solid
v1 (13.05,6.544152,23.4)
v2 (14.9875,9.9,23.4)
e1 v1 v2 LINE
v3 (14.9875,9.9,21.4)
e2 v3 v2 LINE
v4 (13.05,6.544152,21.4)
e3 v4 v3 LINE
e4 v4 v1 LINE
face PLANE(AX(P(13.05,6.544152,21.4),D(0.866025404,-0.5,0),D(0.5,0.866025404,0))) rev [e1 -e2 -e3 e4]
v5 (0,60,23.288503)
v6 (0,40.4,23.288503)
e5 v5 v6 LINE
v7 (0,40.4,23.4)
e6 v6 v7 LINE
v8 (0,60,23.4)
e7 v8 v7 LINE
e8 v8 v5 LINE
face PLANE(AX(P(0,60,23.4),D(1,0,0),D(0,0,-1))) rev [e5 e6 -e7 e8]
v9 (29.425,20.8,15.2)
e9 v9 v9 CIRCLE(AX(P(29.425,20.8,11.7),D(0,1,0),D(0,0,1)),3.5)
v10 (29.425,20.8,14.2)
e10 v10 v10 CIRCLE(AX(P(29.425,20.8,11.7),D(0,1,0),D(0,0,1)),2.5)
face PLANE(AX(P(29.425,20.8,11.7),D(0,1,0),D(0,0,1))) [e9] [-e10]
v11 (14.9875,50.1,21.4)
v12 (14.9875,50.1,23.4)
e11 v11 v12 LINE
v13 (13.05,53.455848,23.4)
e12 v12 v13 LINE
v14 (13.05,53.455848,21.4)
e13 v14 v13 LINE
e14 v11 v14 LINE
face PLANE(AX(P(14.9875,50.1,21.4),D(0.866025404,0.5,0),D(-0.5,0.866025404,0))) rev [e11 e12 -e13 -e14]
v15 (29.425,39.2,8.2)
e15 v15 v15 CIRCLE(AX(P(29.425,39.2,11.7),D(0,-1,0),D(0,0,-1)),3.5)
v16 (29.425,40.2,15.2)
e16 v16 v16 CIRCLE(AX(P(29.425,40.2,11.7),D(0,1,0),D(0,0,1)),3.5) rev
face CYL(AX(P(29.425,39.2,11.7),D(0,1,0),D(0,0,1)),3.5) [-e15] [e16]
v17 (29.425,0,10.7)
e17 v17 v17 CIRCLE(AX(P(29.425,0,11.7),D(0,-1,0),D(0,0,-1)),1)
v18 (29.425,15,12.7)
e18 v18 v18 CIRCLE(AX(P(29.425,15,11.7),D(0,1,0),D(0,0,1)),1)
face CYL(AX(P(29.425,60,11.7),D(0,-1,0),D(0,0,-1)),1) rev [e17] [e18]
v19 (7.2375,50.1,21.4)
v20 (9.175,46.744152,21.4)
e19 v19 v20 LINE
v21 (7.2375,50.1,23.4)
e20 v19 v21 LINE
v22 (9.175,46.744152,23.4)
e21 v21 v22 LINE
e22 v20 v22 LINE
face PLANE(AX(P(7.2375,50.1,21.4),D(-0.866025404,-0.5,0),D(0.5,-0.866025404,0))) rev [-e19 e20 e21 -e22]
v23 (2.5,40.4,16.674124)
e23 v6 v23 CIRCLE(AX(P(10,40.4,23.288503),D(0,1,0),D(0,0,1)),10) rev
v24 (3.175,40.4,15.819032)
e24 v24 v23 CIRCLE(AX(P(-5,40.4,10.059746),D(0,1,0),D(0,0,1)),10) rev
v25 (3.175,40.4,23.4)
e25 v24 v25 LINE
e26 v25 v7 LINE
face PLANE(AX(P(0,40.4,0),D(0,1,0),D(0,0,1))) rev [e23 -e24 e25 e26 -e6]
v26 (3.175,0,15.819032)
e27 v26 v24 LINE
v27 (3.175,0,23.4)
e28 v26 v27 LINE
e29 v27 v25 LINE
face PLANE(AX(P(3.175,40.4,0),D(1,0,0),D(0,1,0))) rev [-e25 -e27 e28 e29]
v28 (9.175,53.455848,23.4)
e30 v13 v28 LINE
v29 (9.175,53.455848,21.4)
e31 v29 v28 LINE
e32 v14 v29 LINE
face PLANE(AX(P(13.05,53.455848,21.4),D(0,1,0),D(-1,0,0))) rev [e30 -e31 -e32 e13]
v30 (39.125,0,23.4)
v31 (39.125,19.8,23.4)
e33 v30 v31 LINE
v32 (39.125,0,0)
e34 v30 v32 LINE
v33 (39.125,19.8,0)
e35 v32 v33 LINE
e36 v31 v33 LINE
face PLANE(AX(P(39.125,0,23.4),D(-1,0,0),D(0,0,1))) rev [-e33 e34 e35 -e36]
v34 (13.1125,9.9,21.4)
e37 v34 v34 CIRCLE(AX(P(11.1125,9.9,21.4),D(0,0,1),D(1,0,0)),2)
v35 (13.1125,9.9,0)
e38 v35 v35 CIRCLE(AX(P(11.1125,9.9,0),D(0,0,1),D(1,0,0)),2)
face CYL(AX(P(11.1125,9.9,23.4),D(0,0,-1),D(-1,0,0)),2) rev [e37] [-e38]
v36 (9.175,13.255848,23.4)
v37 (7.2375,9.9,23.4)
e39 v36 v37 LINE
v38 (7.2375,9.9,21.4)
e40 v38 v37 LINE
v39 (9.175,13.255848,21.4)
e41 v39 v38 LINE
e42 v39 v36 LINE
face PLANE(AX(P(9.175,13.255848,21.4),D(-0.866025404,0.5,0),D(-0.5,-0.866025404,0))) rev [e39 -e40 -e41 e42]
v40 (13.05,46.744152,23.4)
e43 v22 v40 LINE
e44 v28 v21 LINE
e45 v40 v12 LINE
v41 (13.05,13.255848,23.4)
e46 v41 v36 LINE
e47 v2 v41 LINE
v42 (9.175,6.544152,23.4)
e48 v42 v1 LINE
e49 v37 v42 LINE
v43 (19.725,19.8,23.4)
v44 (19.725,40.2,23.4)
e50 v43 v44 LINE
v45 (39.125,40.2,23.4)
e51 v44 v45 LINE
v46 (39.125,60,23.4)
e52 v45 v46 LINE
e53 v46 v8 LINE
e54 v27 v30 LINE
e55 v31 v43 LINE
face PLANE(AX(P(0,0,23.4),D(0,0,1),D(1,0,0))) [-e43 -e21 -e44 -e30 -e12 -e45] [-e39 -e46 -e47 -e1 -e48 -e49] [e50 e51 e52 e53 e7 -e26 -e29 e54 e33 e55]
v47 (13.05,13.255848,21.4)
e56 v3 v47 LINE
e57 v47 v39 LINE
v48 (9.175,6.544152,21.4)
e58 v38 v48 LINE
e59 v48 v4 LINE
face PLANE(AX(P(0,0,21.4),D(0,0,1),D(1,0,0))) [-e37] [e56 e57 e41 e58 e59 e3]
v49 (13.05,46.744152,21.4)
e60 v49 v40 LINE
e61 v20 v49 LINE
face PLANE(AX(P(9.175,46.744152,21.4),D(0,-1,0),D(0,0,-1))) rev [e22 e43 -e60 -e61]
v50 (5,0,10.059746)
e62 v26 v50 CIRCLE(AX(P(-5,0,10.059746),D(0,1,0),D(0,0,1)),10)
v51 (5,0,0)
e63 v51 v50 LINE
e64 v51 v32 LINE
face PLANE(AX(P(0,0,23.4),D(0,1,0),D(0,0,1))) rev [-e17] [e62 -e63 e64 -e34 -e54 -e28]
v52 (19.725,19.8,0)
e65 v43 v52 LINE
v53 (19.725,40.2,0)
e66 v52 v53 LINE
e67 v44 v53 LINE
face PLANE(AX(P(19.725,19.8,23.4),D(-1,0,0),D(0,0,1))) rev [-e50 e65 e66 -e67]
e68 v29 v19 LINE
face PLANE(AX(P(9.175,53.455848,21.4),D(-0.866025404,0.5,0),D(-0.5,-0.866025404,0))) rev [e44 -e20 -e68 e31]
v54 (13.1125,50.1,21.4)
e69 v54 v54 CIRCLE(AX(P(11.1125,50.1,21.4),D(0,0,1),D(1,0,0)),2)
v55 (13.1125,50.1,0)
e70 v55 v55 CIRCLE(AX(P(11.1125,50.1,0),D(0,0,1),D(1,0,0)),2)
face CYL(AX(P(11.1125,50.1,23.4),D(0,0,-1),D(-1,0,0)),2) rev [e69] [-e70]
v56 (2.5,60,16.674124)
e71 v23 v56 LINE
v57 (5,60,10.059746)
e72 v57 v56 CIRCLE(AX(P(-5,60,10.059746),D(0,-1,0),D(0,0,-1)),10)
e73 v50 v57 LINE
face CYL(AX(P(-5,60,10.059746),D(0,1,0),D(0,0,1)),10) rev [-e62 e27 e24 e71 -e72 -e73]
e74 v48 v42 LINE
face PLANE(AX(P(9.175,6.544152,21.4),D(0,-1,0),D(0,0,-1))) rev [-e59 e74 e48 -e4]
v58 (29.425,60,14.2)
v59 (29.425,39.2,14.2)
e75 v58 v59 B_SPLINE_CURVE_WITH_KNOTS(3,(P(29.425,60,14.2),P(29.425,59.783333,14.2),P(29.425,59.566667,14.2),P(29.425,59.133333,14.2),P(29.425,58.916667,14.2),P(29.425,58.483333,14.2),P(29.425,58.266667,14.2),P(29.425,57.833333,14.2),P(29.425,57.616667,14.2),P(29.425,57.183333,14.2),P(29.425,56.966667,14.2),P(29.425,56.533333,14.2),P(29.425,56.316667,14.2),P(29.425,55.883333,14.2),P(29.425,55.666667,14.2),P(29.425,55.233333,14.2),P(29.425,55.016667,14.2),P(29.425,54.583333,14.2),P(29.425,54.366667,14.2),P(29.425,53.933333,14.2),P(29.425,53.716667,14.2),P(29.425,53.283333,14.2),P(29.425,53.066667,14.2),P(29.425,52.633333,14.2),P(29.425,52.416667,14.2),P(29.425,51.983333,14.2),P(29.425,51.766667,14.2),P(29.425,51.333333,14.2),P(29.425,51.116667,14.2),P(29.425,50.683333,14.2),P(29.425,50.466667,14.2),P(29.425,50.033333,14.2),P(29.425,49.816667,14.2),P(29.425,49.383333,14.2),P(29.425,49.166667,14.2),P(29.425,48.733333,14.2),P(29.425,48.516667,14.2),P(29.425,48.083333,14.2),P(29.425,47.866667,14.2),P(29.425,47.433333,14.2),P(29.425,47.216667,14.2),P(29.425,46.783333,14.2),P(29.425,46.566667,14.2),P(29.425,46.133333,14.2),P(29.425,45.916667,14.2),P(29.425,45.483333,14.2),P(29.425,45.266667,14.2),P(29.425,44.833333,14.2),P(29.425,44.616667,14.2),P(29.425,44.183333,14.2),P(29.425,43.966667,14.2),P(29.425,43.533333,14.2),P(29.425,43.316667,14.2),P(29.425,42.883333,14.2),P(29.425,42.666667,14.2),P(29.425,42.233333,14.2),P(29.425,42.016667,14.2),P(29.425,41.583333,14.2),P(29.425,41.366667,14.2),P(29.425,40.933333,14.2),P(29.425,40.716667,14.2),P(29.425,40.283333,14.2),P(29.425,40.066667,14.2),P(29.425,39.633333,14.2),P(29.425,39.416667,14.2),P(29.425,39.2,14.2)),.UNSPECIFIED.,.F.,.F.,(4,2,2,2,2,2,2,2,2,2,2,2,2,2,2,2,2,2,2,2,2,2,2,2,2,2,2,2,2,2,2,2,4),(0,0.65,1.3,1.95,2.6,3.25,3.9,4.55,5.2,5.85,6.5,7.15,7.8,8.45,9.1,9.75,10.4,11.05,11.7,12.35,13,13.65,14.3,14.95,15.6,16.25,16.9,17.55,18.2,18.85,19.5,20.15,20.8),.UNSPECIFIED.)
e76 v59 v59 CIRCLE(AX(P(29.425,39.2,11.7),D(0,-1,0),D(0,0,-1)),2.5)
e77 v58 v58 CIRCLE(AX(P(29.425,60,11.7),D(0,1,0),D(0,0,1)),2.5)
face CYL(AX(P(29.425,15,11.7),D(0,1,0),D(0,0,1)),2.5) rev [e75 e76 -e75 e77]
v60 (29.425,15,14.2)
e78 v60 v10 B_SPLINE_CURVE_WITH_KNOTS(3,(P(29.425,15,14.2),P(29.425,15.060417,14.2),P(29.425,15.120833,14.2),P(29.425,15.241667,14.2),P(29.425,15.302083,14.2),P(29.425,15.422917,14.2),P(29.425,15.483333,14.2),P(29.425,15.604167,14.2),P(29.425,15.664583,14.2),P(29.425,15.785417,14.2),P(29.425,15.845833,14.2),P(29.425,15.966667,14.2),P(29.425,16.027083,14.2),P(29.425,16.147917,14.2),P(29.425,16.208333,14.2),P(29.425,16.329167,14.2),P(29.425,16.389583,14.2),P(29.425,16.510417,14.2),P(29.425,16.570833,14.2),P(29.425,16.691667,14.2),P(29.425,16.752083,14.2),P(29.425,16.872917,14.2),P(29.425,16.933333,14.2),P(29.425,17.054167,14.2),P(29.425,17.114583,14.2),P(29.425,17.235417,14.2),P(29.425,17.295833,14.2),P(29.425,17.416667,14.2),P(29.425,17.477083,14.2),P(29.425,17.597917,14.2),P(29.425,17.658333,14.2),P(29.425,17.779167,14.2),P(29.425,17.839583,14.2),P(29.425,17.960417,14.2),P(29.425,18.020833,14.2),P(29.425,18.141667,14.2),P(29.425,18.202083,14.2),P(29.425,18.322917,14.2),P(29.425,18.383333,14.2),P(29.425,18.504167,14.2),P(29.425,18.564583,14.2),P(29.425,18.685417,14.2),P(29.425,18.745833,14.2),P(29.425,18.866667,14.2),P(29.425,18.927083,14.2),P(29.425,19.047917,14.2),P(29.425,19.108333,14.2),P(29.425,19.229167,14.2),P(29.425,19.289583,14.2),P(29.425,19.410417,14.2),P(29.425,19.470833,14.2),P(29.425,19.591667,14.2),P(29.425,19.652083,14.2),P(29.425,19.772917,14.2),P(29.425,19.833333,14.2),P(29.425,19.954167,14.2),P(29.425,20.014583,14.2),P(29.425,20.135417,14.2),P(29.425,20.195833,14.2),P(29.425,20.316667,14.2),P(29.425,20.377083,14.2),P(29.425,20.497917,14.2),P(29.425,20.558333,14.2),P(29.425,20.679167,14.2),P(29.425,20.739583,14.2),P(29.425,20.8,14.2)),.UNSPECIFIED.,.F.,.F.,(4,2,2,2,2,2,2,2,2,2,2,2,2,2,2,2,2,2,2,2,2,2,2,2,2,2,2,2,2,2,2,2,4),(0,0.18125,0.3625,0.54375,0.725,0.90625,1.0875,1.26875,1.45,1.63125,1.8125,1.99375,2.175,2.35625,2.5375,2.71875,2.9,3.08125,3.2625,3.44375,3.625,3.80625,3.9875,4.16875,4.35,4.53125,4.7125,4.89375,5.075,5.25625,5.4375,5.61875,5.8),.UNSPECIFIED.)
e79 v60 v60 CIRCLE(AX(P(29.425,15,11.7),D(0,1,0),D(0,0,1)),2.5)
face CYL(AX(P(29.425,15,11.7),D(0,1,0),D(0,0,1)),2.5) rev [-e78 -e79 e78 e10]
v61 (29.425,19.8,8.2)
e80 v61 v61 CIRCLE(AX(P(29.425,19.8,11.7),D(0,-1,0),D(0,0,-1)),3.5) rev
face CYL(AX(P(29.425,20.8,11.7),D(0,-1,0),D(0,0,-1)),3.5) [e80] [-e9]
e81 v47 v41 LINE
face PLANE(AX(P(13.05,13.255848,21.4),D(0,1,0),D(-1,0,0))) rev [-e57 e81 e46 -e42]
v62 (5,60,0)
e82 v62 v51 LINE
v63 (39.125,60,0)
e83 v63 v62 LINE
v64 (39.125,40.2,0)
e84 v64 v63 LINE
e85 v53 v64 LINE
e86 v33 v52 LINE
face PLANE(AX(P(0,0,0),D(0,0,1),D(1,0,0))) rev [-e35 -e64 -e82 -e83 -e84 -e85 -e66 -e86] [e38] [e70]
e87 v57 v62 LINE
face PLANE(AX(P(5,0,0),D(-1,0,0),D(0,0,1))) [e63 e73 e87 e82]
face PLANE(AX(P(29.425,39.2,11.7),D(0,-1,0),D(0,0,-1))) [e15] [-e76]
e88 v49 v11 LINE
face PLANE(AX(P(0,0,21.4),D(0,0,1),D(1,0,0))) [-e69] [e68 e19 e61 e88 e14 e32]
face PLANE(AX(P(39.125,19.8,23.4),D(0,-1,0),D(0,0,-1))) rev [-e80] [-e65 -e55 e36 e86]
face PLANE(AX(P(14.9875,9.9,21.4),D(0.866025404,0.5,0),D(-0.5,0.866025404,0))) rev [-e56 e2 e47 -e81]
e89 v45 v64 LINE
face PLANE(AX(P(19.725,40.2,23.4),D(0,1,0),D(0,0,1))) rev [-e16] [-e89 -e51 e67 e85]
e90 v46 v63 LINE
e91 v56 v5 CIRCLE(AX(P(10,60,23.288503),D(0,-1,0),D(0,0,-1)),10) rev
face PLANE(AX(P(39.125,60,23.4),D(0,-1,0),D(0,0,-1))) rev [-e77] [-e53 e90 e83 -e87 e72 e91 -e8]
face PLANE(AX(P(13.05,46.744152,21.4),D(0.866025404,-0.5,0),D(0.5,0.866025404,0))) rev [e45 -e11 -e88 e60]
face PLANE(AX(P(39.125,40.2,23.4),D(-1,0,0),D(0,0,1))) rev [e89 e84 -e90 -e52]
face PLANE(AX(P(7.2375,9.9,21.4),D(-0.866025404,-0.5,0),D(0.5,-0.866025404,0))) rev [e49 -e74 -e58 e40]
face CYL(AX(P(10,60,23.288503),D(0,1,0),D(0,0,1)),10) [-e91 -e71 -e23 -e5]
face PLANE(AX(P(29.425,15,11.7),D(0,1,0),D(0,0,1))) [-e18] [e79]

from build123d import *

# Parameters (mm, degrees)
MAINBLOCK_R                      = 2
MAINBLOCKBOSS_EXTRUDE1_DEPTH     = 23.4
TOPHOLECUT_SKETCH2_R             = 2.5
TOPHOLECUT_EXTRUDE1_DEPTH        = 45
MOUNTHOLEBORECUT_EXTRUDE2_DEPTH  = 2
TOPSPACERSKETCH4_R               = 3.5
TOPSPACERSKETCH4_R_2             = 2.5
TOPSPACERBOSS_EXTRUDE2_DEPTH     = 1
LOWERSPACERBOSS_EXTRUDE3_START   = 1
LOWERSPACERSKETCH5_R             = 3.5
LOWERSPACERSKETCH5_R_2           = 2.5
LOWERSPACERBOSS_EXTRUDE3_DEPTH   = 1
PUSHPINHOLESKETCH1_R             = 1
PUSHPINHOLECUT_EXTRUDE1_DEPTH    = 76.354665582
SCREWCOLLISIONSKETCH2_W          = 18.72
SCREWCOLLISIONSKETCH2_H          = 60
SCREWCOLLISIONCUT_EXTRUDE2_DEPTH = 5
SCREWCOLLISIONFILLET1_R          = 10
SCREWCOLLISIONFILLET2_R          = 10
MIDRAILINDENTSKETCH1_W           = 3.175
MIDRAILINDENTSKETCH1_H           = 40.4
MIDRAILINDENTCUT_EXTRUDE1_DEPTH  = 76.354665582


with BuildPart() as part:
    # MainBlock → MainBlockBoss-Extrude1 (new body)
    with BuildSketch(Plane.XY):
        Polygon((0, 0), (39.125, 0), (39.125, 19.8), (19.725, 19.8), (19.725, 40.2), (39.125, 40.2), (39.125, 60), (0, 60), align=None)
        with Locations((11.1125, 50.1)):
            Circle(MAINBLOCK_R, mode=Mode.SUBTRACT)
        with Locations((11.1125, 9.9)):
            Circle(MAINBLOCK_R, mode=Mode.SUBTRACT)
    extrude(amount=MAINBLOCKBOSS_EXTRUDE1_DEPTH)

    # TopHoleCut-Sketch2 → TopHoleCut-Extrude1 (cut)
    with BuildSketch(Plane(origin=(0, 60, 0), x_dir=(1, 0, 0), z_dir=(0, 1, 0))):
        with Locations(Location((29.425, -11.7, 0), (0, 0, 270))):
            Circle(TOPHOLECUT_SKETCH2_R)
    extrude(amount=-TOPHOLECUT_EXTRUDE1_DEPTH, mode=Mode.SUBTRACT)

    # MountHoleBoreSketch3 → MountHoleBoreCut-Extrude2 (cut)
    with BuildSketch(Plane.XY.offset(23.4)):
        Polygon((14.9875, 50.1), (13.05, 53.45584844), (9.175, 53.45584844), (7.2375, 50.1), (9.175, 46.74415156), (13.05, 46.74415156), align=None)
        Polygon((14.9875, 9.9), (13.05, 13.25584844), (9.175, 13.25584844), (7.2375, 9.9), (9.175, 6.54415156), (13.05, 6.54415156), align=None)
    extrude(amount=-MOUNTHOLEBORECUT_EXTRUDE2_DEPTH, mode=Mode.SUBTRACT)

    # TopSpacerSketch4 → TopSpacerBoss-Extrude2 (add)
    with BuildSketch(Plane.XZ.offset(-40.2)):
        with Locations(Location((29.425, 11.7, 0), (0, 0, 90))):
            Circle(TOPSPACERSKETCH4_R)
        with Locations(Location((29.425, 11.7, 0), (0, 0, 90))):
            Circle(TOPSPACERSKETCH4_R_2, mode=Mode.SUBTRACT)
    extrude(amount=TOPSPACERBOSS_EXTRUDE2_DEPTH)

    # LowerSpacerSketch5 → LowerSpacerBoss-Extrude3 (add)
    with BuildSketch(Plane(origin=(0, 19.8, 0), x_dir=(1, 0, 0), z_dir=(0, 1, 0)).offset(LOWERSPACERBOSS_EXTRUDE3_START)):
        with Locations(Location((29.425, -11.7, 0), (0, 0, 270))):
            Circle(LOWERSPACERSKETCH5_R)
        with Locations(Location((29.425, -11.7, 0), (0, 0, 270))):
            Circle(LOWERSPACERSKETCH5_R_2, mode=Mode.SUBTRACT)
    extrude(amount=-LOWERSPACERBOSS_EXTRUDE3_DEPTH)

    # PushPinHoleSketch1 → PushPinHoleCut-Extrude1 (cut, through all)
    with BuildSketch(Plane.XZ):
        with Locations(Location((29.425, 11.7, 0), (0, 0, 270))):
            Circle(PUSHPINHOLESKETCH1_R)
    extrude(amount=-PUSHPINHOLECUT_EXTRUDE1_DEPTH, mode=Mode.SUBTRACT)

    # ScrewCollisionSketch2 → ScrewCollisionCut-Extrude2 (cut)
    with BuildSketch(Plane.ZY):
        with Locations((9.36, 30)):
            Rectangle(SCREWCOLLISIONSKETCH2_W, SCREWCOLLISIONSKETCH2_H)
    extrude(amount=-SCREWCOLLISIONCUT_EXTRUDE2_DEPTH, mode=Mode.SUBTRACT)

    # ScrewCollisionFillet1
    # the kernel refuses this fillet: 10 mm, written as the material it adds along each edge
    with BuildSketch(Plane(origin=(5, 60, 18.72), x_dir=(-1, 0, 0), z_dir=(0, -1, 0))) as screwcollisionfillet1_piece_1:
        with BuildLine():
            CenterArc((10, 8.660254038), SCREWCOLLISIONFILLET1_R, 180, 60)
            Line((0, 8.660254038), (-0.2, 8.660254038))
            Line((-0.2, 8.660254038), (-0.2, 0))
            Line((-0.2, 0), (0, -0.2))
            ThreePointArc((0, -0.2), (2.5, -0.2), (4.9, -0.173205081))
            Line((4.9, -0.173205081), (5, 0))
        make_face()
    extrude(amount=60)

    # ScrewCollisionFillet2
    screwcollisionfillet2_edges = [part.edges().sort_by_distance(p)[0] for p in [
        (0, 30, 18.72),
    ]]
    fillet(screwcollisionfillet2_edges, radius=SCREWCOLLISIONFILLET2_R)

    # MidRailIndentSketch1 → MidRailIndentCut-Extrude1 (cut, through all)
    with BuildSketch(Plane.XY.offset(23.4)):
        with Locations((1.5875, 20.2)):
            Rectangle(MIDRAILINDENTSKETCH1_W, MIDRAILINDENTSKETCH1_H)
    extrude(amount=-MIDRAILINDENTCUT_EXTRUDE1_DEPTH, mode=Mode.SUBTRACT)


solid = part.part
